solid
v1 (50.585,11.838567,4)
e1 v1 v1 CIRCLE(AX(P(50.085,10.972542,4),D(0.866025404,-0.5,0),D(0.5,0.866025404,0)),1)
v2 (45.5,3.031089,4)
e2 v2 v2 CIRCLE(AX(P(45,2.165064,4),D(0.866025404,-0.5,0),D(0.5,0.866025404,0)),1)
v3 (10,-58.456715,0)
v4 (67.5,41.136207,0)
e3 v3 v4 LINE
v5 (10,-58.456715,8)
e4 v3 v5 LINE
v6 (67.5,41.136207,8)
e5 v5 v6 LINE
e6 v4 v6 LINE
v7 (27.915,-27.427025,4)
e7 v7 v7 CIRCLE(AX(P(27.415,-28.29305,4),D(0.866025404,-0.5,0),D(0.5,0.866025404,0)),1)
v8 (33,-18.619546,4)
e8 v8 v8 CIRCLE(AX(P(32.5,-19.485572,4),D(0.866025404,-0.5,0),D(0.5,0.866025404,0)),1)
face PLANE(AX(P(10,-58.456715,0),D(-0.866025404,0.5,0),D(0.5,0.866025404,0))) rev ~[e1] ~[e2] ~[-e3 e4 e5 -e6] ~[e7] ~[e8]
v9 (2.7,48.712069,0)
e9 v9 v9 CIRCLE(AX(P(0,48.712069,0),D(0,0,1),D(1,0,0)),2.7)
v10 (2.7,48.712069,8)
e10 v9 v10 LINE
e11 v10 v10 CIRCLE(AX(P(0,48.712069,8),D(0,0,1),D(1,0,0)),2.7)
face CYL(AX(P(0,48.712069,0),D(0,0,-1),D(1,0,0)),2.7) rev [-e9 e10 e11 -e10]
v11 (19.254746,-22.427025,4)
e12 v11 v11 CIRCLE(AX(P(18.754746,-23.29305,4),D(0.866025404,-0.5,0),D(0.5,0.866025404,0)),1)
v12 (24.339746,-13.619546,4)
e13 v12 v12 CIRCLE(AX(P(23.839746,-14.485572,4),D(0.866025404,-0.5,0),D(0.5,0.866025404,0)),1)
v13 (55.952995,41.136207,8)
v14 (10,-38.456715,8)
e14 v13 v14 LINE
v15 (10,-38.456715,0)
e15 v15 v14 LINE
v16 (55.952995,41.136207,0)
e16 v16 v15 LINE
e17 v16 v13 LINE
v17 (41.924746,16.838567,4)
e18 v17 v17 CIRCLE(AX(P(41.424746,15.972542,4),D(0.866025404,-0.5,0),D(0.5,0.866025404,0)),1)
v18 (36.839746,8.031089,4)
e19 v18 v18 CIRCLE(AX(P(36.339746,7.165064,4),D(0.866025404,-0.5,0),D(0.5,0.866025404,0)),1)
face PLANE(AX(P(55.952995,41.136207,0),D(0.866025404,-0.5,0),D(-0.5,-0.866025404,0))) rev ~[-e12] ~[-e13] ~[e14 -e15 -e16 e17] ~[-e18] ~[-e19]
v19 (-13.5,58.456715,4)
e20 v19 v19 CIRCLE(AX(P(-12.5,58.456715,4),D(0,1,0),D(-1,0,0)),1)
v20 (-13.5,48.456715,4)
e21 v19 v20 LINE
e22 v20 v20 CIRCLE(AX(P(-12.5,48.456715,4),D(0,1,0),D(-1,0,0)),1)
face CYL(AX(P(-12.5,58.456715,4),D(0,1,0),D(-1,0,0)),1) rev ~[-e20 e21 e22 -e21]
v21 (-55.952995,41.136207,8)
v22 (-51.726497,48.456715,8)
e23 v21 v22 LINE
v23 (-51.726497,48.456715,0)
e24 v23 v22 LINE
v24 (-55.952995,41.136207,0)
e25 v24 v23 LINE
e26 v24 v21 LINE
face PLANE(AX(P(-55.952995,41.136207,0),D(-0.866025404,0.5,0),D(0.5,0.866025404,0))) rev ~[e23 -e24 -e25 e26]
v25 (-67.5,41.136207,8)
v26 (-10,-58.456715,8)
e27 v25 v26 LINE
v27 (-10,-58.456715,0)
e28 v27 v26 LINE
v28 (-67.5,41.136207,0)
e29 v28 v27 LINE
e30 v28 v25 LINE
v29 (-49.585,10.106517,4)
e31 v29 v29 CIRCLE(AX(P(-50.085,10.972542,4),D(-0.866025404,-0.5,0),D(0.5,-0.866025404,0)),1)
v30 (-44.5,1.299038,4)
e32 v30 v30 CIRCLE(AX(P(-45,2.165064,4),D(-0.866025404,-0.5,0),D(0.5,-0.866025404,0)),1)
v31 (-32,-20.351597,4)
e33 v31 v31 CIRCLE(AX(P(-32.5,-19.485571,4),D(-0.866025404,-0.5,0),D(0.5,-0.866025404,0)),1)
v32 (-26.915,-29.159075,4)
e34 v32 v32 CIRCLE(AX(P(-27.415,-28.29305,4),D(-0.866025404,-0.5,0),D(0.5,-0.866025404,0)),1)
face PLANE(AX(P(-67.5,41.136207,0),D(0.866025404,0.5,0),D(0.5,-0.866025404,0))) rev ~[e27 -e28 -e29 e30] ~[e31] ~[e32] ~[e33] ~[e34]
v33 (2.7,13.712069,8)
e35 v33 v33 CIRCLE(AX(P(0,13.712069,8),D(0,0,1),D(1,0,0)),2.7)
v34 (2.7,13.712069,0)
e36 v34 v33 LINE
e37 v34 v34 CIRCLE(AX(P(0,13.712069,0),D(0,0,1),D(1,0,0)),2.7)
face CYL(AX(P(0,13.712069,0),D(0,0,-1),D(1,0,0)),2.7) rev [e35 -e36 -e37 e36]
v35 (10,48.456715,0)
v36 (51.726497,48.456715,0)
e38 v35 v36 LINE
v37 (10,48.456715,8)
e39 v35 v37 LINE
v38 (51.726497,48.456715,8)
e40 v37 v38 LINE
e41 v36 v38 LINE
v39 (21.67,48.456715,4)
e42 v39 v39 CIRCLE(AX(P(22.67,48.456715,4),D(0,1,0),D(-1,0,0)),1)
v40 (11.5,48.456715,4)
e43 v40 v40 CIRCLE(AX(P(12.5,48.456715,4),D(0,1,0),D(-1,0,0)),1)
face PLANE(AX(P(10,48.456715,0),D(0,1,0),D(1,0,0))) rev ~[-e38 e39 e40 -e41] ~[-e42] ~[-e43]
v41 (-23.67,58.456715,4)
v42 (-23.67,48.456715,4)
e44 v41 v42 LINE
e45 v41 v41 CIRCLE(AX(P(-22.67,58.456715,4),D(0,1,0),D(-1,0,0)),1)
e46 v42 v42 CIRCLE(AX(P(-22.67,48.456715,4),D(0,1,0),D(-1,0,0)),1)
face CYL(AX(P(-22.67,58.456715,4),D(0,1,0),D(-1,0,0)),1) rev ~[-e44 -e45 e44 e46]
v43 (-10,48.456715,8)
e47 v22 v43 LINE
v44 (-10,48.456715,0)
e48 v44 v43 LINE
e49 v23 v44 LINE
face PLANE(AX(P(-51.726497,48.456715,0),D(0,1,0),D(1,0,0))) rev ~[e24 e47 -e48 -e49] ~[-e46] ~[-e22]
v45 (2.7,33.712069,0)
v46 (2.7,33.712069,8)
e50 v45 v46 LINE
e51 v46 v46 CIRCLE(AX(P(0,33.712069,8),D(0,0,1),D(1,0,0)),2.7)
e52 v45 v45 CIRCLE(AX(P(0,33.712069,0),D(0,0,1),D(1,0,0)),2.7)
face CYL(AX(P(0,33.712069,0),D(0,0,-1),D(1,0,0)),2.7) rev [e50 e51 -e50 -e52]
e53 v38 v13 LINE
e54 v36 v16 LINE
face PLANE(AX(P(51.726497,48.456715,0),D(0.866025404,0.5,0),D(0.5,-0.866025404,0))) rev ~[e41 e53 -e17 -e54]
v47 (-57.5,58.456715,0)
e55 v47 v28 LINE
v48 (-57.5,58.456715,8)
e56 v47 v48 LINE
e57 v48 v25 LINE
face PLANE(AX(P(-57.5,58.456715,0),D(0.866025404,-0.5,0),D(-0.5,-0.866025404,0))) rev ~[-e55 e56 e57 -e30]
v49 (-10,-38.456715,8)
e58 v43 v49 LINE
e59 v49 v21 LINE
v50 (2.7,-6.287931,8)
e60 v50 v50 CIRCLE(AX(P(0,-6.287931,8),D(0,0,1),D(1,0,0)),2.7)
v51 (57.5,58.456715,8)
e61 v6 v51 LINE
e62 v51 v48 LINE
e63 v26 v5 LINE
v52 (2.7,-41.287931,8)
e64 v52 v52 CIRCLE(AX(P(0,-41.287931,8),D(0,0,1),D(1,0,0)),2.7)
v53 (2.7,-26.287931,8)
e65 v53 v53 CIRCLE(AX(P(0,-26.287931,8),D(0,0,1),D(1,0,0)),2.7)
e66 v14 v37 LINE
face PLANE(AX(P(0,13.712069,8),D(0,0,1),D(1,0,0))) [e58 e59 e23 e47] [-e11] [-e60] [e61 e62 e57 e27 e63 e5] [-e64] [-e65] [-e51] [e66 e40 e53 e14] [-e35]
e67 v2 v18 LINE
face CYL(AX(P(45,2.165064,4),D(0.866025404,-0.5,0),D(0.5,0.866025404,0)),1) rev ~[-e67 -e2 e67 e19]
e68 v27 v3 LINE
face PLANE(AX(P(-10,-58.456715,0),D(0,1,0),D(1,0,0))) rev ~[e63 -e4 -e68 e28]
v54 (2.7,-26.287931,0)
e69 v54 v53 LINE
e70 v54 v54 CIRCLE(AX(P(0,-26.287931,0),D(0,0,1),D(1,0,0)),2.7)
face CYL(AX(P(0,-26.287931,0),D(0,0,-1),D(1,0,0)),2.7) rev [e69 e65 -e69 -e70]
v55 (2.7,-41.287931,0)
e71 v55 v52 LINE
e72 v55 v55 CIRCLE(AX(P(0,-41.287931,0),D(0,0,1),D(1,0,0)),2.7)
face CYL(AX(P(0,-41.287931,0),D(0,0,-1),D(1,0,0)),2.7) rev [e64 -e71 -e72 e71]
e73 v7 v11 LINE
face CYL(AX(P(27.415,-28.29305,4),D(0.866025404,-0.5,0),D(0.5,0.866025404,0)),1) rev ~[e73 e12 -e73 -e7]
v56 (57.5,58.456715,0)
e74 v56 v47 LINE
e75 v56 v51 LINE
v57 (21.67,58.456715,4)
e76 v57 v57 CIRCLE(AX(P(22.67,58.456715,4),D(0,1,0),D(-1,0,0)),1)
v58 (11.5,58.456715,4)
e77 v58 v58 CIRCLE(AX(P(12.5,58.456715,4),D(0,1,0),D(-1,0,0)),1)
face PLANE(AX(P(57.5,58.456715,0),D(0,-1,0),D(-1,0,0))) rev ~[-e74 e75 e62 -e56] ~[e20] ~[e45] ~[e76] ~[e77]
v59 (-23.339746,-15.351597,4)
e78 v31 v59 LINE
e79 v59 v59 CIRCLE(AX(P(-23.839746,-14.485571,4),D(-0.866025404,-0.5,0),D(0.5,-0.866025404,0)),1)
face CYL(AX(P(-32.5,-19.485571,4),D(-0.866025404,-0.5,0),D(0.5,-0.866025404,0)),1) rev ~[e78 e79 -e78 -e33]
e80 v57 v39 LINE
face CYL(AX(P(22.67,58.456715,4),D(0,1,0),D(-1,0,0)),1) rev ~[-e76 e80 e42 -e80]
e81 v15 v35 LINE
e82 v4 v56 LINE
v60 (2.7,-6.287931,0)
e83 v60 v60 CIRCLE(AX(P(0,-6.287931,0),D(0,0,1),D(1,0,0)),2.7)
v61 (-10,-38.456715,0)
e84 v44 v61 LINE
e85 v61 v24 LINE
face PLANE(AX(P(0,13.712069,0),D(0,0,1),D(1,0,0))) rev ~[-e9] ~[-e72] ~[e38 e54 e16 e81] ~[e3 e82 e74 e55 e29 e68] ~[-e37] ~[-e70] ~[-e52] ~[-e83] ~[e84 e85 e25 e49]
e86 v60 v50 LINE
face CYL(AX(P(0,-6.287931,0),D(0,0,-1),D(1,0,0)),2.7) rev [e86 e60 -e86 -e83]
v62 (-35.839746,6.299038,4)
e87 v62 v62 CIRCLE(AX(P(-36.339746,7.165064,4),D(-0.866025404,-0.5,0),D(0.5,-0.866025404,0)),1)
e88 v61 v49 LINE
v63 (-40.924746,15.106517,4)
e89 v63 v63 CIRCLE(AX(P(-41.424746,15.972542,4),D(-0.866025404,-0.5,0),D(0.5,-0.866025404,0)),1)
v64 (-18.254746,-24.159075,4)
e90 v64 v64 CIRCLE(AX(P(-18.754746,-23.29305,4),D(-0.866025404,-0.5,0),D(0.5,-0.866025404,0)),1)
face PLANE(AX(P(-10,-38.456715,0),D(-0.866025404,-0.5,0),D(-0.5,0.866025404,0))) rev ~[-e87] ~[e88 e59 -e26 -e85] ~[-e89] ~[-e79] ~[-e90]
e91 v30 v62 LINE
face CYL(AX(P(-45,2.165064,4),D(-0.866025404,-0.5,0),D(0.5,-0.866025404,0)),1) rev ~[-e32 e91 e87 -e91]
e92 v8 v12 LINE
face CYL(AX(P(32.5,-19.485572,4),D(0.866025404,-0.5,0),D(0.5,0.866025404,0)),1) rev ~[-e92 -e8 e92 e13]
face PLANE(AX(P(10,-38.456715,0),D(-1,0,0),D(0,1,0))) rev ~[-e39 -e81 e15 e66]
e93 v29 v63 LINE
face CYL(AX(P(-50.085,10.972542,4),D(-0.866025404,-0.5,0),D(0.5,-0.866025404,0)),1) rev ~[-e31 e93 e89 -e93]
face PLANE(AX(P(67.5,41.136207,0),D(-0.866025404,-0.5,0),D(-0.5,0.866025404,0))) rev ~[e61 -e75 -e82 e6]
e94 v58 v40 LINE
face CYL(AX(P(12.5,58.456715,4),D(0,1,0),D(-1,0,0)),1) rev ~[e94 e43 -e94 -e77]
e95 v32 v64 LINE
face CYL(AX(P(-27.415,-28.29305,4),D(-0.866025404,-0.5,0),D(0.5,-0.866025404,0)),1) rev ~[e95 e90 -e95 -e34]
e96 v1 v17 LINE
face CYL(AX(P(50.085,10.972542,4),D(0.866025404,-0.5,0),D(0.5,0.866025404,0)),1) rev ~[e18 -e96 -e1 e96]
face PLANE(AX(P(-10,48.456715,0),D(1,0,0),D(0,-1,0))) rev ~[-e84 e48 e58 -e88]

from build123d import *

# Parameters (mm, degrees)
F0_R            = 2.7
F1_DEPTH        = 8
F2_R            = 1
F3_DEPTH        = 11
F3_COPIES_COUNT = 3


# Not quite as in the source:
# - a pattern or mirror of a feature is missing from the dataset's text; its kind, count and spacing are read off the source's solid


with BuildPart() as f1:
    # F0 (on Top) → F1 (new body)
    with BuildSketch(Plane.XY):
        Polygon((57.5, 58.4567147554), (-57.5, 58.4567147554), (-67.5, 41.1362066798), (-10, -58.4567147554), (10, -58.4567147554), (67.5, 41.1362066798), align=None)
        with Locations((0, -41.2879311067)):
            Circle(F0_R, mode=Mode.SUBTRACT)
        with Locations((0, -26.2879311067)):
            Circle(F0_R, mode=Mode.SUBTRACT)
        with Locations((0, -6.2879311067)):
            Circle(F0_R, mode=Mode.SUBTRACT)
        Polygon((-10, 48.4567147554), (-10, -38.4567147554), (-55.9529946162, 41.1362066798), (-51.7264973081, 48.4567147554), align=None, mode=Mode.SUBTRACT)
        with Locations((0, 13.7120688933)):
            Circle(F0_R, mode=Mode.SUBTRACT)
        Polygon((51.7264973081, 48.4567147554), (55.9529946162, 41.1362066798), (10, -38.4567147554), (10, 48.4567147554), align=None, mode=Mode.SUBTRACT)
        with Locations((0, 33.7120688933)):
            Circle(F0_R, mode=Mode.SUBTRACT)
        with Locations((0, 48.7120688933)):
            Circle(F0_R, mode=Mode.SUBTRACT)
    extrude(amount=F1_DEPTH)

    # F2 (on face) → F3 (cut)
    with BuildSketch(Plane(origin=(32.8125, -18.9443057078, 0), x_dir=(0.5, 0.8660254038, 0), z_dir=(0.8660254038, -0.5, 0))):
        with Locations((-10.795, 4)):
            Circle(F2_R)
        with Locations((-0.625, 4)):
            Circle(F2_R)
        with Locations((34.545, 4)):
            Circle(F2_R)
        with Locations((24.375, 4)):
            Circle(F2_R)
    f3 = extrude(amount=-F3_DEPTH, mode=Mode.SUBTRACT)

    # F3_copies: F3 ×3 about axis
    f3_copies_axis = Axis((0, 13.712069, 0), (0, 0, 1))
    for i in range(1, F3_COPIES_COUNT):
        add(f3.rotate(f3_copies_axis, i * 360 / F3_COPIES_COUNT), mode=Mode.SUBTRACT)


solid = f1.part
